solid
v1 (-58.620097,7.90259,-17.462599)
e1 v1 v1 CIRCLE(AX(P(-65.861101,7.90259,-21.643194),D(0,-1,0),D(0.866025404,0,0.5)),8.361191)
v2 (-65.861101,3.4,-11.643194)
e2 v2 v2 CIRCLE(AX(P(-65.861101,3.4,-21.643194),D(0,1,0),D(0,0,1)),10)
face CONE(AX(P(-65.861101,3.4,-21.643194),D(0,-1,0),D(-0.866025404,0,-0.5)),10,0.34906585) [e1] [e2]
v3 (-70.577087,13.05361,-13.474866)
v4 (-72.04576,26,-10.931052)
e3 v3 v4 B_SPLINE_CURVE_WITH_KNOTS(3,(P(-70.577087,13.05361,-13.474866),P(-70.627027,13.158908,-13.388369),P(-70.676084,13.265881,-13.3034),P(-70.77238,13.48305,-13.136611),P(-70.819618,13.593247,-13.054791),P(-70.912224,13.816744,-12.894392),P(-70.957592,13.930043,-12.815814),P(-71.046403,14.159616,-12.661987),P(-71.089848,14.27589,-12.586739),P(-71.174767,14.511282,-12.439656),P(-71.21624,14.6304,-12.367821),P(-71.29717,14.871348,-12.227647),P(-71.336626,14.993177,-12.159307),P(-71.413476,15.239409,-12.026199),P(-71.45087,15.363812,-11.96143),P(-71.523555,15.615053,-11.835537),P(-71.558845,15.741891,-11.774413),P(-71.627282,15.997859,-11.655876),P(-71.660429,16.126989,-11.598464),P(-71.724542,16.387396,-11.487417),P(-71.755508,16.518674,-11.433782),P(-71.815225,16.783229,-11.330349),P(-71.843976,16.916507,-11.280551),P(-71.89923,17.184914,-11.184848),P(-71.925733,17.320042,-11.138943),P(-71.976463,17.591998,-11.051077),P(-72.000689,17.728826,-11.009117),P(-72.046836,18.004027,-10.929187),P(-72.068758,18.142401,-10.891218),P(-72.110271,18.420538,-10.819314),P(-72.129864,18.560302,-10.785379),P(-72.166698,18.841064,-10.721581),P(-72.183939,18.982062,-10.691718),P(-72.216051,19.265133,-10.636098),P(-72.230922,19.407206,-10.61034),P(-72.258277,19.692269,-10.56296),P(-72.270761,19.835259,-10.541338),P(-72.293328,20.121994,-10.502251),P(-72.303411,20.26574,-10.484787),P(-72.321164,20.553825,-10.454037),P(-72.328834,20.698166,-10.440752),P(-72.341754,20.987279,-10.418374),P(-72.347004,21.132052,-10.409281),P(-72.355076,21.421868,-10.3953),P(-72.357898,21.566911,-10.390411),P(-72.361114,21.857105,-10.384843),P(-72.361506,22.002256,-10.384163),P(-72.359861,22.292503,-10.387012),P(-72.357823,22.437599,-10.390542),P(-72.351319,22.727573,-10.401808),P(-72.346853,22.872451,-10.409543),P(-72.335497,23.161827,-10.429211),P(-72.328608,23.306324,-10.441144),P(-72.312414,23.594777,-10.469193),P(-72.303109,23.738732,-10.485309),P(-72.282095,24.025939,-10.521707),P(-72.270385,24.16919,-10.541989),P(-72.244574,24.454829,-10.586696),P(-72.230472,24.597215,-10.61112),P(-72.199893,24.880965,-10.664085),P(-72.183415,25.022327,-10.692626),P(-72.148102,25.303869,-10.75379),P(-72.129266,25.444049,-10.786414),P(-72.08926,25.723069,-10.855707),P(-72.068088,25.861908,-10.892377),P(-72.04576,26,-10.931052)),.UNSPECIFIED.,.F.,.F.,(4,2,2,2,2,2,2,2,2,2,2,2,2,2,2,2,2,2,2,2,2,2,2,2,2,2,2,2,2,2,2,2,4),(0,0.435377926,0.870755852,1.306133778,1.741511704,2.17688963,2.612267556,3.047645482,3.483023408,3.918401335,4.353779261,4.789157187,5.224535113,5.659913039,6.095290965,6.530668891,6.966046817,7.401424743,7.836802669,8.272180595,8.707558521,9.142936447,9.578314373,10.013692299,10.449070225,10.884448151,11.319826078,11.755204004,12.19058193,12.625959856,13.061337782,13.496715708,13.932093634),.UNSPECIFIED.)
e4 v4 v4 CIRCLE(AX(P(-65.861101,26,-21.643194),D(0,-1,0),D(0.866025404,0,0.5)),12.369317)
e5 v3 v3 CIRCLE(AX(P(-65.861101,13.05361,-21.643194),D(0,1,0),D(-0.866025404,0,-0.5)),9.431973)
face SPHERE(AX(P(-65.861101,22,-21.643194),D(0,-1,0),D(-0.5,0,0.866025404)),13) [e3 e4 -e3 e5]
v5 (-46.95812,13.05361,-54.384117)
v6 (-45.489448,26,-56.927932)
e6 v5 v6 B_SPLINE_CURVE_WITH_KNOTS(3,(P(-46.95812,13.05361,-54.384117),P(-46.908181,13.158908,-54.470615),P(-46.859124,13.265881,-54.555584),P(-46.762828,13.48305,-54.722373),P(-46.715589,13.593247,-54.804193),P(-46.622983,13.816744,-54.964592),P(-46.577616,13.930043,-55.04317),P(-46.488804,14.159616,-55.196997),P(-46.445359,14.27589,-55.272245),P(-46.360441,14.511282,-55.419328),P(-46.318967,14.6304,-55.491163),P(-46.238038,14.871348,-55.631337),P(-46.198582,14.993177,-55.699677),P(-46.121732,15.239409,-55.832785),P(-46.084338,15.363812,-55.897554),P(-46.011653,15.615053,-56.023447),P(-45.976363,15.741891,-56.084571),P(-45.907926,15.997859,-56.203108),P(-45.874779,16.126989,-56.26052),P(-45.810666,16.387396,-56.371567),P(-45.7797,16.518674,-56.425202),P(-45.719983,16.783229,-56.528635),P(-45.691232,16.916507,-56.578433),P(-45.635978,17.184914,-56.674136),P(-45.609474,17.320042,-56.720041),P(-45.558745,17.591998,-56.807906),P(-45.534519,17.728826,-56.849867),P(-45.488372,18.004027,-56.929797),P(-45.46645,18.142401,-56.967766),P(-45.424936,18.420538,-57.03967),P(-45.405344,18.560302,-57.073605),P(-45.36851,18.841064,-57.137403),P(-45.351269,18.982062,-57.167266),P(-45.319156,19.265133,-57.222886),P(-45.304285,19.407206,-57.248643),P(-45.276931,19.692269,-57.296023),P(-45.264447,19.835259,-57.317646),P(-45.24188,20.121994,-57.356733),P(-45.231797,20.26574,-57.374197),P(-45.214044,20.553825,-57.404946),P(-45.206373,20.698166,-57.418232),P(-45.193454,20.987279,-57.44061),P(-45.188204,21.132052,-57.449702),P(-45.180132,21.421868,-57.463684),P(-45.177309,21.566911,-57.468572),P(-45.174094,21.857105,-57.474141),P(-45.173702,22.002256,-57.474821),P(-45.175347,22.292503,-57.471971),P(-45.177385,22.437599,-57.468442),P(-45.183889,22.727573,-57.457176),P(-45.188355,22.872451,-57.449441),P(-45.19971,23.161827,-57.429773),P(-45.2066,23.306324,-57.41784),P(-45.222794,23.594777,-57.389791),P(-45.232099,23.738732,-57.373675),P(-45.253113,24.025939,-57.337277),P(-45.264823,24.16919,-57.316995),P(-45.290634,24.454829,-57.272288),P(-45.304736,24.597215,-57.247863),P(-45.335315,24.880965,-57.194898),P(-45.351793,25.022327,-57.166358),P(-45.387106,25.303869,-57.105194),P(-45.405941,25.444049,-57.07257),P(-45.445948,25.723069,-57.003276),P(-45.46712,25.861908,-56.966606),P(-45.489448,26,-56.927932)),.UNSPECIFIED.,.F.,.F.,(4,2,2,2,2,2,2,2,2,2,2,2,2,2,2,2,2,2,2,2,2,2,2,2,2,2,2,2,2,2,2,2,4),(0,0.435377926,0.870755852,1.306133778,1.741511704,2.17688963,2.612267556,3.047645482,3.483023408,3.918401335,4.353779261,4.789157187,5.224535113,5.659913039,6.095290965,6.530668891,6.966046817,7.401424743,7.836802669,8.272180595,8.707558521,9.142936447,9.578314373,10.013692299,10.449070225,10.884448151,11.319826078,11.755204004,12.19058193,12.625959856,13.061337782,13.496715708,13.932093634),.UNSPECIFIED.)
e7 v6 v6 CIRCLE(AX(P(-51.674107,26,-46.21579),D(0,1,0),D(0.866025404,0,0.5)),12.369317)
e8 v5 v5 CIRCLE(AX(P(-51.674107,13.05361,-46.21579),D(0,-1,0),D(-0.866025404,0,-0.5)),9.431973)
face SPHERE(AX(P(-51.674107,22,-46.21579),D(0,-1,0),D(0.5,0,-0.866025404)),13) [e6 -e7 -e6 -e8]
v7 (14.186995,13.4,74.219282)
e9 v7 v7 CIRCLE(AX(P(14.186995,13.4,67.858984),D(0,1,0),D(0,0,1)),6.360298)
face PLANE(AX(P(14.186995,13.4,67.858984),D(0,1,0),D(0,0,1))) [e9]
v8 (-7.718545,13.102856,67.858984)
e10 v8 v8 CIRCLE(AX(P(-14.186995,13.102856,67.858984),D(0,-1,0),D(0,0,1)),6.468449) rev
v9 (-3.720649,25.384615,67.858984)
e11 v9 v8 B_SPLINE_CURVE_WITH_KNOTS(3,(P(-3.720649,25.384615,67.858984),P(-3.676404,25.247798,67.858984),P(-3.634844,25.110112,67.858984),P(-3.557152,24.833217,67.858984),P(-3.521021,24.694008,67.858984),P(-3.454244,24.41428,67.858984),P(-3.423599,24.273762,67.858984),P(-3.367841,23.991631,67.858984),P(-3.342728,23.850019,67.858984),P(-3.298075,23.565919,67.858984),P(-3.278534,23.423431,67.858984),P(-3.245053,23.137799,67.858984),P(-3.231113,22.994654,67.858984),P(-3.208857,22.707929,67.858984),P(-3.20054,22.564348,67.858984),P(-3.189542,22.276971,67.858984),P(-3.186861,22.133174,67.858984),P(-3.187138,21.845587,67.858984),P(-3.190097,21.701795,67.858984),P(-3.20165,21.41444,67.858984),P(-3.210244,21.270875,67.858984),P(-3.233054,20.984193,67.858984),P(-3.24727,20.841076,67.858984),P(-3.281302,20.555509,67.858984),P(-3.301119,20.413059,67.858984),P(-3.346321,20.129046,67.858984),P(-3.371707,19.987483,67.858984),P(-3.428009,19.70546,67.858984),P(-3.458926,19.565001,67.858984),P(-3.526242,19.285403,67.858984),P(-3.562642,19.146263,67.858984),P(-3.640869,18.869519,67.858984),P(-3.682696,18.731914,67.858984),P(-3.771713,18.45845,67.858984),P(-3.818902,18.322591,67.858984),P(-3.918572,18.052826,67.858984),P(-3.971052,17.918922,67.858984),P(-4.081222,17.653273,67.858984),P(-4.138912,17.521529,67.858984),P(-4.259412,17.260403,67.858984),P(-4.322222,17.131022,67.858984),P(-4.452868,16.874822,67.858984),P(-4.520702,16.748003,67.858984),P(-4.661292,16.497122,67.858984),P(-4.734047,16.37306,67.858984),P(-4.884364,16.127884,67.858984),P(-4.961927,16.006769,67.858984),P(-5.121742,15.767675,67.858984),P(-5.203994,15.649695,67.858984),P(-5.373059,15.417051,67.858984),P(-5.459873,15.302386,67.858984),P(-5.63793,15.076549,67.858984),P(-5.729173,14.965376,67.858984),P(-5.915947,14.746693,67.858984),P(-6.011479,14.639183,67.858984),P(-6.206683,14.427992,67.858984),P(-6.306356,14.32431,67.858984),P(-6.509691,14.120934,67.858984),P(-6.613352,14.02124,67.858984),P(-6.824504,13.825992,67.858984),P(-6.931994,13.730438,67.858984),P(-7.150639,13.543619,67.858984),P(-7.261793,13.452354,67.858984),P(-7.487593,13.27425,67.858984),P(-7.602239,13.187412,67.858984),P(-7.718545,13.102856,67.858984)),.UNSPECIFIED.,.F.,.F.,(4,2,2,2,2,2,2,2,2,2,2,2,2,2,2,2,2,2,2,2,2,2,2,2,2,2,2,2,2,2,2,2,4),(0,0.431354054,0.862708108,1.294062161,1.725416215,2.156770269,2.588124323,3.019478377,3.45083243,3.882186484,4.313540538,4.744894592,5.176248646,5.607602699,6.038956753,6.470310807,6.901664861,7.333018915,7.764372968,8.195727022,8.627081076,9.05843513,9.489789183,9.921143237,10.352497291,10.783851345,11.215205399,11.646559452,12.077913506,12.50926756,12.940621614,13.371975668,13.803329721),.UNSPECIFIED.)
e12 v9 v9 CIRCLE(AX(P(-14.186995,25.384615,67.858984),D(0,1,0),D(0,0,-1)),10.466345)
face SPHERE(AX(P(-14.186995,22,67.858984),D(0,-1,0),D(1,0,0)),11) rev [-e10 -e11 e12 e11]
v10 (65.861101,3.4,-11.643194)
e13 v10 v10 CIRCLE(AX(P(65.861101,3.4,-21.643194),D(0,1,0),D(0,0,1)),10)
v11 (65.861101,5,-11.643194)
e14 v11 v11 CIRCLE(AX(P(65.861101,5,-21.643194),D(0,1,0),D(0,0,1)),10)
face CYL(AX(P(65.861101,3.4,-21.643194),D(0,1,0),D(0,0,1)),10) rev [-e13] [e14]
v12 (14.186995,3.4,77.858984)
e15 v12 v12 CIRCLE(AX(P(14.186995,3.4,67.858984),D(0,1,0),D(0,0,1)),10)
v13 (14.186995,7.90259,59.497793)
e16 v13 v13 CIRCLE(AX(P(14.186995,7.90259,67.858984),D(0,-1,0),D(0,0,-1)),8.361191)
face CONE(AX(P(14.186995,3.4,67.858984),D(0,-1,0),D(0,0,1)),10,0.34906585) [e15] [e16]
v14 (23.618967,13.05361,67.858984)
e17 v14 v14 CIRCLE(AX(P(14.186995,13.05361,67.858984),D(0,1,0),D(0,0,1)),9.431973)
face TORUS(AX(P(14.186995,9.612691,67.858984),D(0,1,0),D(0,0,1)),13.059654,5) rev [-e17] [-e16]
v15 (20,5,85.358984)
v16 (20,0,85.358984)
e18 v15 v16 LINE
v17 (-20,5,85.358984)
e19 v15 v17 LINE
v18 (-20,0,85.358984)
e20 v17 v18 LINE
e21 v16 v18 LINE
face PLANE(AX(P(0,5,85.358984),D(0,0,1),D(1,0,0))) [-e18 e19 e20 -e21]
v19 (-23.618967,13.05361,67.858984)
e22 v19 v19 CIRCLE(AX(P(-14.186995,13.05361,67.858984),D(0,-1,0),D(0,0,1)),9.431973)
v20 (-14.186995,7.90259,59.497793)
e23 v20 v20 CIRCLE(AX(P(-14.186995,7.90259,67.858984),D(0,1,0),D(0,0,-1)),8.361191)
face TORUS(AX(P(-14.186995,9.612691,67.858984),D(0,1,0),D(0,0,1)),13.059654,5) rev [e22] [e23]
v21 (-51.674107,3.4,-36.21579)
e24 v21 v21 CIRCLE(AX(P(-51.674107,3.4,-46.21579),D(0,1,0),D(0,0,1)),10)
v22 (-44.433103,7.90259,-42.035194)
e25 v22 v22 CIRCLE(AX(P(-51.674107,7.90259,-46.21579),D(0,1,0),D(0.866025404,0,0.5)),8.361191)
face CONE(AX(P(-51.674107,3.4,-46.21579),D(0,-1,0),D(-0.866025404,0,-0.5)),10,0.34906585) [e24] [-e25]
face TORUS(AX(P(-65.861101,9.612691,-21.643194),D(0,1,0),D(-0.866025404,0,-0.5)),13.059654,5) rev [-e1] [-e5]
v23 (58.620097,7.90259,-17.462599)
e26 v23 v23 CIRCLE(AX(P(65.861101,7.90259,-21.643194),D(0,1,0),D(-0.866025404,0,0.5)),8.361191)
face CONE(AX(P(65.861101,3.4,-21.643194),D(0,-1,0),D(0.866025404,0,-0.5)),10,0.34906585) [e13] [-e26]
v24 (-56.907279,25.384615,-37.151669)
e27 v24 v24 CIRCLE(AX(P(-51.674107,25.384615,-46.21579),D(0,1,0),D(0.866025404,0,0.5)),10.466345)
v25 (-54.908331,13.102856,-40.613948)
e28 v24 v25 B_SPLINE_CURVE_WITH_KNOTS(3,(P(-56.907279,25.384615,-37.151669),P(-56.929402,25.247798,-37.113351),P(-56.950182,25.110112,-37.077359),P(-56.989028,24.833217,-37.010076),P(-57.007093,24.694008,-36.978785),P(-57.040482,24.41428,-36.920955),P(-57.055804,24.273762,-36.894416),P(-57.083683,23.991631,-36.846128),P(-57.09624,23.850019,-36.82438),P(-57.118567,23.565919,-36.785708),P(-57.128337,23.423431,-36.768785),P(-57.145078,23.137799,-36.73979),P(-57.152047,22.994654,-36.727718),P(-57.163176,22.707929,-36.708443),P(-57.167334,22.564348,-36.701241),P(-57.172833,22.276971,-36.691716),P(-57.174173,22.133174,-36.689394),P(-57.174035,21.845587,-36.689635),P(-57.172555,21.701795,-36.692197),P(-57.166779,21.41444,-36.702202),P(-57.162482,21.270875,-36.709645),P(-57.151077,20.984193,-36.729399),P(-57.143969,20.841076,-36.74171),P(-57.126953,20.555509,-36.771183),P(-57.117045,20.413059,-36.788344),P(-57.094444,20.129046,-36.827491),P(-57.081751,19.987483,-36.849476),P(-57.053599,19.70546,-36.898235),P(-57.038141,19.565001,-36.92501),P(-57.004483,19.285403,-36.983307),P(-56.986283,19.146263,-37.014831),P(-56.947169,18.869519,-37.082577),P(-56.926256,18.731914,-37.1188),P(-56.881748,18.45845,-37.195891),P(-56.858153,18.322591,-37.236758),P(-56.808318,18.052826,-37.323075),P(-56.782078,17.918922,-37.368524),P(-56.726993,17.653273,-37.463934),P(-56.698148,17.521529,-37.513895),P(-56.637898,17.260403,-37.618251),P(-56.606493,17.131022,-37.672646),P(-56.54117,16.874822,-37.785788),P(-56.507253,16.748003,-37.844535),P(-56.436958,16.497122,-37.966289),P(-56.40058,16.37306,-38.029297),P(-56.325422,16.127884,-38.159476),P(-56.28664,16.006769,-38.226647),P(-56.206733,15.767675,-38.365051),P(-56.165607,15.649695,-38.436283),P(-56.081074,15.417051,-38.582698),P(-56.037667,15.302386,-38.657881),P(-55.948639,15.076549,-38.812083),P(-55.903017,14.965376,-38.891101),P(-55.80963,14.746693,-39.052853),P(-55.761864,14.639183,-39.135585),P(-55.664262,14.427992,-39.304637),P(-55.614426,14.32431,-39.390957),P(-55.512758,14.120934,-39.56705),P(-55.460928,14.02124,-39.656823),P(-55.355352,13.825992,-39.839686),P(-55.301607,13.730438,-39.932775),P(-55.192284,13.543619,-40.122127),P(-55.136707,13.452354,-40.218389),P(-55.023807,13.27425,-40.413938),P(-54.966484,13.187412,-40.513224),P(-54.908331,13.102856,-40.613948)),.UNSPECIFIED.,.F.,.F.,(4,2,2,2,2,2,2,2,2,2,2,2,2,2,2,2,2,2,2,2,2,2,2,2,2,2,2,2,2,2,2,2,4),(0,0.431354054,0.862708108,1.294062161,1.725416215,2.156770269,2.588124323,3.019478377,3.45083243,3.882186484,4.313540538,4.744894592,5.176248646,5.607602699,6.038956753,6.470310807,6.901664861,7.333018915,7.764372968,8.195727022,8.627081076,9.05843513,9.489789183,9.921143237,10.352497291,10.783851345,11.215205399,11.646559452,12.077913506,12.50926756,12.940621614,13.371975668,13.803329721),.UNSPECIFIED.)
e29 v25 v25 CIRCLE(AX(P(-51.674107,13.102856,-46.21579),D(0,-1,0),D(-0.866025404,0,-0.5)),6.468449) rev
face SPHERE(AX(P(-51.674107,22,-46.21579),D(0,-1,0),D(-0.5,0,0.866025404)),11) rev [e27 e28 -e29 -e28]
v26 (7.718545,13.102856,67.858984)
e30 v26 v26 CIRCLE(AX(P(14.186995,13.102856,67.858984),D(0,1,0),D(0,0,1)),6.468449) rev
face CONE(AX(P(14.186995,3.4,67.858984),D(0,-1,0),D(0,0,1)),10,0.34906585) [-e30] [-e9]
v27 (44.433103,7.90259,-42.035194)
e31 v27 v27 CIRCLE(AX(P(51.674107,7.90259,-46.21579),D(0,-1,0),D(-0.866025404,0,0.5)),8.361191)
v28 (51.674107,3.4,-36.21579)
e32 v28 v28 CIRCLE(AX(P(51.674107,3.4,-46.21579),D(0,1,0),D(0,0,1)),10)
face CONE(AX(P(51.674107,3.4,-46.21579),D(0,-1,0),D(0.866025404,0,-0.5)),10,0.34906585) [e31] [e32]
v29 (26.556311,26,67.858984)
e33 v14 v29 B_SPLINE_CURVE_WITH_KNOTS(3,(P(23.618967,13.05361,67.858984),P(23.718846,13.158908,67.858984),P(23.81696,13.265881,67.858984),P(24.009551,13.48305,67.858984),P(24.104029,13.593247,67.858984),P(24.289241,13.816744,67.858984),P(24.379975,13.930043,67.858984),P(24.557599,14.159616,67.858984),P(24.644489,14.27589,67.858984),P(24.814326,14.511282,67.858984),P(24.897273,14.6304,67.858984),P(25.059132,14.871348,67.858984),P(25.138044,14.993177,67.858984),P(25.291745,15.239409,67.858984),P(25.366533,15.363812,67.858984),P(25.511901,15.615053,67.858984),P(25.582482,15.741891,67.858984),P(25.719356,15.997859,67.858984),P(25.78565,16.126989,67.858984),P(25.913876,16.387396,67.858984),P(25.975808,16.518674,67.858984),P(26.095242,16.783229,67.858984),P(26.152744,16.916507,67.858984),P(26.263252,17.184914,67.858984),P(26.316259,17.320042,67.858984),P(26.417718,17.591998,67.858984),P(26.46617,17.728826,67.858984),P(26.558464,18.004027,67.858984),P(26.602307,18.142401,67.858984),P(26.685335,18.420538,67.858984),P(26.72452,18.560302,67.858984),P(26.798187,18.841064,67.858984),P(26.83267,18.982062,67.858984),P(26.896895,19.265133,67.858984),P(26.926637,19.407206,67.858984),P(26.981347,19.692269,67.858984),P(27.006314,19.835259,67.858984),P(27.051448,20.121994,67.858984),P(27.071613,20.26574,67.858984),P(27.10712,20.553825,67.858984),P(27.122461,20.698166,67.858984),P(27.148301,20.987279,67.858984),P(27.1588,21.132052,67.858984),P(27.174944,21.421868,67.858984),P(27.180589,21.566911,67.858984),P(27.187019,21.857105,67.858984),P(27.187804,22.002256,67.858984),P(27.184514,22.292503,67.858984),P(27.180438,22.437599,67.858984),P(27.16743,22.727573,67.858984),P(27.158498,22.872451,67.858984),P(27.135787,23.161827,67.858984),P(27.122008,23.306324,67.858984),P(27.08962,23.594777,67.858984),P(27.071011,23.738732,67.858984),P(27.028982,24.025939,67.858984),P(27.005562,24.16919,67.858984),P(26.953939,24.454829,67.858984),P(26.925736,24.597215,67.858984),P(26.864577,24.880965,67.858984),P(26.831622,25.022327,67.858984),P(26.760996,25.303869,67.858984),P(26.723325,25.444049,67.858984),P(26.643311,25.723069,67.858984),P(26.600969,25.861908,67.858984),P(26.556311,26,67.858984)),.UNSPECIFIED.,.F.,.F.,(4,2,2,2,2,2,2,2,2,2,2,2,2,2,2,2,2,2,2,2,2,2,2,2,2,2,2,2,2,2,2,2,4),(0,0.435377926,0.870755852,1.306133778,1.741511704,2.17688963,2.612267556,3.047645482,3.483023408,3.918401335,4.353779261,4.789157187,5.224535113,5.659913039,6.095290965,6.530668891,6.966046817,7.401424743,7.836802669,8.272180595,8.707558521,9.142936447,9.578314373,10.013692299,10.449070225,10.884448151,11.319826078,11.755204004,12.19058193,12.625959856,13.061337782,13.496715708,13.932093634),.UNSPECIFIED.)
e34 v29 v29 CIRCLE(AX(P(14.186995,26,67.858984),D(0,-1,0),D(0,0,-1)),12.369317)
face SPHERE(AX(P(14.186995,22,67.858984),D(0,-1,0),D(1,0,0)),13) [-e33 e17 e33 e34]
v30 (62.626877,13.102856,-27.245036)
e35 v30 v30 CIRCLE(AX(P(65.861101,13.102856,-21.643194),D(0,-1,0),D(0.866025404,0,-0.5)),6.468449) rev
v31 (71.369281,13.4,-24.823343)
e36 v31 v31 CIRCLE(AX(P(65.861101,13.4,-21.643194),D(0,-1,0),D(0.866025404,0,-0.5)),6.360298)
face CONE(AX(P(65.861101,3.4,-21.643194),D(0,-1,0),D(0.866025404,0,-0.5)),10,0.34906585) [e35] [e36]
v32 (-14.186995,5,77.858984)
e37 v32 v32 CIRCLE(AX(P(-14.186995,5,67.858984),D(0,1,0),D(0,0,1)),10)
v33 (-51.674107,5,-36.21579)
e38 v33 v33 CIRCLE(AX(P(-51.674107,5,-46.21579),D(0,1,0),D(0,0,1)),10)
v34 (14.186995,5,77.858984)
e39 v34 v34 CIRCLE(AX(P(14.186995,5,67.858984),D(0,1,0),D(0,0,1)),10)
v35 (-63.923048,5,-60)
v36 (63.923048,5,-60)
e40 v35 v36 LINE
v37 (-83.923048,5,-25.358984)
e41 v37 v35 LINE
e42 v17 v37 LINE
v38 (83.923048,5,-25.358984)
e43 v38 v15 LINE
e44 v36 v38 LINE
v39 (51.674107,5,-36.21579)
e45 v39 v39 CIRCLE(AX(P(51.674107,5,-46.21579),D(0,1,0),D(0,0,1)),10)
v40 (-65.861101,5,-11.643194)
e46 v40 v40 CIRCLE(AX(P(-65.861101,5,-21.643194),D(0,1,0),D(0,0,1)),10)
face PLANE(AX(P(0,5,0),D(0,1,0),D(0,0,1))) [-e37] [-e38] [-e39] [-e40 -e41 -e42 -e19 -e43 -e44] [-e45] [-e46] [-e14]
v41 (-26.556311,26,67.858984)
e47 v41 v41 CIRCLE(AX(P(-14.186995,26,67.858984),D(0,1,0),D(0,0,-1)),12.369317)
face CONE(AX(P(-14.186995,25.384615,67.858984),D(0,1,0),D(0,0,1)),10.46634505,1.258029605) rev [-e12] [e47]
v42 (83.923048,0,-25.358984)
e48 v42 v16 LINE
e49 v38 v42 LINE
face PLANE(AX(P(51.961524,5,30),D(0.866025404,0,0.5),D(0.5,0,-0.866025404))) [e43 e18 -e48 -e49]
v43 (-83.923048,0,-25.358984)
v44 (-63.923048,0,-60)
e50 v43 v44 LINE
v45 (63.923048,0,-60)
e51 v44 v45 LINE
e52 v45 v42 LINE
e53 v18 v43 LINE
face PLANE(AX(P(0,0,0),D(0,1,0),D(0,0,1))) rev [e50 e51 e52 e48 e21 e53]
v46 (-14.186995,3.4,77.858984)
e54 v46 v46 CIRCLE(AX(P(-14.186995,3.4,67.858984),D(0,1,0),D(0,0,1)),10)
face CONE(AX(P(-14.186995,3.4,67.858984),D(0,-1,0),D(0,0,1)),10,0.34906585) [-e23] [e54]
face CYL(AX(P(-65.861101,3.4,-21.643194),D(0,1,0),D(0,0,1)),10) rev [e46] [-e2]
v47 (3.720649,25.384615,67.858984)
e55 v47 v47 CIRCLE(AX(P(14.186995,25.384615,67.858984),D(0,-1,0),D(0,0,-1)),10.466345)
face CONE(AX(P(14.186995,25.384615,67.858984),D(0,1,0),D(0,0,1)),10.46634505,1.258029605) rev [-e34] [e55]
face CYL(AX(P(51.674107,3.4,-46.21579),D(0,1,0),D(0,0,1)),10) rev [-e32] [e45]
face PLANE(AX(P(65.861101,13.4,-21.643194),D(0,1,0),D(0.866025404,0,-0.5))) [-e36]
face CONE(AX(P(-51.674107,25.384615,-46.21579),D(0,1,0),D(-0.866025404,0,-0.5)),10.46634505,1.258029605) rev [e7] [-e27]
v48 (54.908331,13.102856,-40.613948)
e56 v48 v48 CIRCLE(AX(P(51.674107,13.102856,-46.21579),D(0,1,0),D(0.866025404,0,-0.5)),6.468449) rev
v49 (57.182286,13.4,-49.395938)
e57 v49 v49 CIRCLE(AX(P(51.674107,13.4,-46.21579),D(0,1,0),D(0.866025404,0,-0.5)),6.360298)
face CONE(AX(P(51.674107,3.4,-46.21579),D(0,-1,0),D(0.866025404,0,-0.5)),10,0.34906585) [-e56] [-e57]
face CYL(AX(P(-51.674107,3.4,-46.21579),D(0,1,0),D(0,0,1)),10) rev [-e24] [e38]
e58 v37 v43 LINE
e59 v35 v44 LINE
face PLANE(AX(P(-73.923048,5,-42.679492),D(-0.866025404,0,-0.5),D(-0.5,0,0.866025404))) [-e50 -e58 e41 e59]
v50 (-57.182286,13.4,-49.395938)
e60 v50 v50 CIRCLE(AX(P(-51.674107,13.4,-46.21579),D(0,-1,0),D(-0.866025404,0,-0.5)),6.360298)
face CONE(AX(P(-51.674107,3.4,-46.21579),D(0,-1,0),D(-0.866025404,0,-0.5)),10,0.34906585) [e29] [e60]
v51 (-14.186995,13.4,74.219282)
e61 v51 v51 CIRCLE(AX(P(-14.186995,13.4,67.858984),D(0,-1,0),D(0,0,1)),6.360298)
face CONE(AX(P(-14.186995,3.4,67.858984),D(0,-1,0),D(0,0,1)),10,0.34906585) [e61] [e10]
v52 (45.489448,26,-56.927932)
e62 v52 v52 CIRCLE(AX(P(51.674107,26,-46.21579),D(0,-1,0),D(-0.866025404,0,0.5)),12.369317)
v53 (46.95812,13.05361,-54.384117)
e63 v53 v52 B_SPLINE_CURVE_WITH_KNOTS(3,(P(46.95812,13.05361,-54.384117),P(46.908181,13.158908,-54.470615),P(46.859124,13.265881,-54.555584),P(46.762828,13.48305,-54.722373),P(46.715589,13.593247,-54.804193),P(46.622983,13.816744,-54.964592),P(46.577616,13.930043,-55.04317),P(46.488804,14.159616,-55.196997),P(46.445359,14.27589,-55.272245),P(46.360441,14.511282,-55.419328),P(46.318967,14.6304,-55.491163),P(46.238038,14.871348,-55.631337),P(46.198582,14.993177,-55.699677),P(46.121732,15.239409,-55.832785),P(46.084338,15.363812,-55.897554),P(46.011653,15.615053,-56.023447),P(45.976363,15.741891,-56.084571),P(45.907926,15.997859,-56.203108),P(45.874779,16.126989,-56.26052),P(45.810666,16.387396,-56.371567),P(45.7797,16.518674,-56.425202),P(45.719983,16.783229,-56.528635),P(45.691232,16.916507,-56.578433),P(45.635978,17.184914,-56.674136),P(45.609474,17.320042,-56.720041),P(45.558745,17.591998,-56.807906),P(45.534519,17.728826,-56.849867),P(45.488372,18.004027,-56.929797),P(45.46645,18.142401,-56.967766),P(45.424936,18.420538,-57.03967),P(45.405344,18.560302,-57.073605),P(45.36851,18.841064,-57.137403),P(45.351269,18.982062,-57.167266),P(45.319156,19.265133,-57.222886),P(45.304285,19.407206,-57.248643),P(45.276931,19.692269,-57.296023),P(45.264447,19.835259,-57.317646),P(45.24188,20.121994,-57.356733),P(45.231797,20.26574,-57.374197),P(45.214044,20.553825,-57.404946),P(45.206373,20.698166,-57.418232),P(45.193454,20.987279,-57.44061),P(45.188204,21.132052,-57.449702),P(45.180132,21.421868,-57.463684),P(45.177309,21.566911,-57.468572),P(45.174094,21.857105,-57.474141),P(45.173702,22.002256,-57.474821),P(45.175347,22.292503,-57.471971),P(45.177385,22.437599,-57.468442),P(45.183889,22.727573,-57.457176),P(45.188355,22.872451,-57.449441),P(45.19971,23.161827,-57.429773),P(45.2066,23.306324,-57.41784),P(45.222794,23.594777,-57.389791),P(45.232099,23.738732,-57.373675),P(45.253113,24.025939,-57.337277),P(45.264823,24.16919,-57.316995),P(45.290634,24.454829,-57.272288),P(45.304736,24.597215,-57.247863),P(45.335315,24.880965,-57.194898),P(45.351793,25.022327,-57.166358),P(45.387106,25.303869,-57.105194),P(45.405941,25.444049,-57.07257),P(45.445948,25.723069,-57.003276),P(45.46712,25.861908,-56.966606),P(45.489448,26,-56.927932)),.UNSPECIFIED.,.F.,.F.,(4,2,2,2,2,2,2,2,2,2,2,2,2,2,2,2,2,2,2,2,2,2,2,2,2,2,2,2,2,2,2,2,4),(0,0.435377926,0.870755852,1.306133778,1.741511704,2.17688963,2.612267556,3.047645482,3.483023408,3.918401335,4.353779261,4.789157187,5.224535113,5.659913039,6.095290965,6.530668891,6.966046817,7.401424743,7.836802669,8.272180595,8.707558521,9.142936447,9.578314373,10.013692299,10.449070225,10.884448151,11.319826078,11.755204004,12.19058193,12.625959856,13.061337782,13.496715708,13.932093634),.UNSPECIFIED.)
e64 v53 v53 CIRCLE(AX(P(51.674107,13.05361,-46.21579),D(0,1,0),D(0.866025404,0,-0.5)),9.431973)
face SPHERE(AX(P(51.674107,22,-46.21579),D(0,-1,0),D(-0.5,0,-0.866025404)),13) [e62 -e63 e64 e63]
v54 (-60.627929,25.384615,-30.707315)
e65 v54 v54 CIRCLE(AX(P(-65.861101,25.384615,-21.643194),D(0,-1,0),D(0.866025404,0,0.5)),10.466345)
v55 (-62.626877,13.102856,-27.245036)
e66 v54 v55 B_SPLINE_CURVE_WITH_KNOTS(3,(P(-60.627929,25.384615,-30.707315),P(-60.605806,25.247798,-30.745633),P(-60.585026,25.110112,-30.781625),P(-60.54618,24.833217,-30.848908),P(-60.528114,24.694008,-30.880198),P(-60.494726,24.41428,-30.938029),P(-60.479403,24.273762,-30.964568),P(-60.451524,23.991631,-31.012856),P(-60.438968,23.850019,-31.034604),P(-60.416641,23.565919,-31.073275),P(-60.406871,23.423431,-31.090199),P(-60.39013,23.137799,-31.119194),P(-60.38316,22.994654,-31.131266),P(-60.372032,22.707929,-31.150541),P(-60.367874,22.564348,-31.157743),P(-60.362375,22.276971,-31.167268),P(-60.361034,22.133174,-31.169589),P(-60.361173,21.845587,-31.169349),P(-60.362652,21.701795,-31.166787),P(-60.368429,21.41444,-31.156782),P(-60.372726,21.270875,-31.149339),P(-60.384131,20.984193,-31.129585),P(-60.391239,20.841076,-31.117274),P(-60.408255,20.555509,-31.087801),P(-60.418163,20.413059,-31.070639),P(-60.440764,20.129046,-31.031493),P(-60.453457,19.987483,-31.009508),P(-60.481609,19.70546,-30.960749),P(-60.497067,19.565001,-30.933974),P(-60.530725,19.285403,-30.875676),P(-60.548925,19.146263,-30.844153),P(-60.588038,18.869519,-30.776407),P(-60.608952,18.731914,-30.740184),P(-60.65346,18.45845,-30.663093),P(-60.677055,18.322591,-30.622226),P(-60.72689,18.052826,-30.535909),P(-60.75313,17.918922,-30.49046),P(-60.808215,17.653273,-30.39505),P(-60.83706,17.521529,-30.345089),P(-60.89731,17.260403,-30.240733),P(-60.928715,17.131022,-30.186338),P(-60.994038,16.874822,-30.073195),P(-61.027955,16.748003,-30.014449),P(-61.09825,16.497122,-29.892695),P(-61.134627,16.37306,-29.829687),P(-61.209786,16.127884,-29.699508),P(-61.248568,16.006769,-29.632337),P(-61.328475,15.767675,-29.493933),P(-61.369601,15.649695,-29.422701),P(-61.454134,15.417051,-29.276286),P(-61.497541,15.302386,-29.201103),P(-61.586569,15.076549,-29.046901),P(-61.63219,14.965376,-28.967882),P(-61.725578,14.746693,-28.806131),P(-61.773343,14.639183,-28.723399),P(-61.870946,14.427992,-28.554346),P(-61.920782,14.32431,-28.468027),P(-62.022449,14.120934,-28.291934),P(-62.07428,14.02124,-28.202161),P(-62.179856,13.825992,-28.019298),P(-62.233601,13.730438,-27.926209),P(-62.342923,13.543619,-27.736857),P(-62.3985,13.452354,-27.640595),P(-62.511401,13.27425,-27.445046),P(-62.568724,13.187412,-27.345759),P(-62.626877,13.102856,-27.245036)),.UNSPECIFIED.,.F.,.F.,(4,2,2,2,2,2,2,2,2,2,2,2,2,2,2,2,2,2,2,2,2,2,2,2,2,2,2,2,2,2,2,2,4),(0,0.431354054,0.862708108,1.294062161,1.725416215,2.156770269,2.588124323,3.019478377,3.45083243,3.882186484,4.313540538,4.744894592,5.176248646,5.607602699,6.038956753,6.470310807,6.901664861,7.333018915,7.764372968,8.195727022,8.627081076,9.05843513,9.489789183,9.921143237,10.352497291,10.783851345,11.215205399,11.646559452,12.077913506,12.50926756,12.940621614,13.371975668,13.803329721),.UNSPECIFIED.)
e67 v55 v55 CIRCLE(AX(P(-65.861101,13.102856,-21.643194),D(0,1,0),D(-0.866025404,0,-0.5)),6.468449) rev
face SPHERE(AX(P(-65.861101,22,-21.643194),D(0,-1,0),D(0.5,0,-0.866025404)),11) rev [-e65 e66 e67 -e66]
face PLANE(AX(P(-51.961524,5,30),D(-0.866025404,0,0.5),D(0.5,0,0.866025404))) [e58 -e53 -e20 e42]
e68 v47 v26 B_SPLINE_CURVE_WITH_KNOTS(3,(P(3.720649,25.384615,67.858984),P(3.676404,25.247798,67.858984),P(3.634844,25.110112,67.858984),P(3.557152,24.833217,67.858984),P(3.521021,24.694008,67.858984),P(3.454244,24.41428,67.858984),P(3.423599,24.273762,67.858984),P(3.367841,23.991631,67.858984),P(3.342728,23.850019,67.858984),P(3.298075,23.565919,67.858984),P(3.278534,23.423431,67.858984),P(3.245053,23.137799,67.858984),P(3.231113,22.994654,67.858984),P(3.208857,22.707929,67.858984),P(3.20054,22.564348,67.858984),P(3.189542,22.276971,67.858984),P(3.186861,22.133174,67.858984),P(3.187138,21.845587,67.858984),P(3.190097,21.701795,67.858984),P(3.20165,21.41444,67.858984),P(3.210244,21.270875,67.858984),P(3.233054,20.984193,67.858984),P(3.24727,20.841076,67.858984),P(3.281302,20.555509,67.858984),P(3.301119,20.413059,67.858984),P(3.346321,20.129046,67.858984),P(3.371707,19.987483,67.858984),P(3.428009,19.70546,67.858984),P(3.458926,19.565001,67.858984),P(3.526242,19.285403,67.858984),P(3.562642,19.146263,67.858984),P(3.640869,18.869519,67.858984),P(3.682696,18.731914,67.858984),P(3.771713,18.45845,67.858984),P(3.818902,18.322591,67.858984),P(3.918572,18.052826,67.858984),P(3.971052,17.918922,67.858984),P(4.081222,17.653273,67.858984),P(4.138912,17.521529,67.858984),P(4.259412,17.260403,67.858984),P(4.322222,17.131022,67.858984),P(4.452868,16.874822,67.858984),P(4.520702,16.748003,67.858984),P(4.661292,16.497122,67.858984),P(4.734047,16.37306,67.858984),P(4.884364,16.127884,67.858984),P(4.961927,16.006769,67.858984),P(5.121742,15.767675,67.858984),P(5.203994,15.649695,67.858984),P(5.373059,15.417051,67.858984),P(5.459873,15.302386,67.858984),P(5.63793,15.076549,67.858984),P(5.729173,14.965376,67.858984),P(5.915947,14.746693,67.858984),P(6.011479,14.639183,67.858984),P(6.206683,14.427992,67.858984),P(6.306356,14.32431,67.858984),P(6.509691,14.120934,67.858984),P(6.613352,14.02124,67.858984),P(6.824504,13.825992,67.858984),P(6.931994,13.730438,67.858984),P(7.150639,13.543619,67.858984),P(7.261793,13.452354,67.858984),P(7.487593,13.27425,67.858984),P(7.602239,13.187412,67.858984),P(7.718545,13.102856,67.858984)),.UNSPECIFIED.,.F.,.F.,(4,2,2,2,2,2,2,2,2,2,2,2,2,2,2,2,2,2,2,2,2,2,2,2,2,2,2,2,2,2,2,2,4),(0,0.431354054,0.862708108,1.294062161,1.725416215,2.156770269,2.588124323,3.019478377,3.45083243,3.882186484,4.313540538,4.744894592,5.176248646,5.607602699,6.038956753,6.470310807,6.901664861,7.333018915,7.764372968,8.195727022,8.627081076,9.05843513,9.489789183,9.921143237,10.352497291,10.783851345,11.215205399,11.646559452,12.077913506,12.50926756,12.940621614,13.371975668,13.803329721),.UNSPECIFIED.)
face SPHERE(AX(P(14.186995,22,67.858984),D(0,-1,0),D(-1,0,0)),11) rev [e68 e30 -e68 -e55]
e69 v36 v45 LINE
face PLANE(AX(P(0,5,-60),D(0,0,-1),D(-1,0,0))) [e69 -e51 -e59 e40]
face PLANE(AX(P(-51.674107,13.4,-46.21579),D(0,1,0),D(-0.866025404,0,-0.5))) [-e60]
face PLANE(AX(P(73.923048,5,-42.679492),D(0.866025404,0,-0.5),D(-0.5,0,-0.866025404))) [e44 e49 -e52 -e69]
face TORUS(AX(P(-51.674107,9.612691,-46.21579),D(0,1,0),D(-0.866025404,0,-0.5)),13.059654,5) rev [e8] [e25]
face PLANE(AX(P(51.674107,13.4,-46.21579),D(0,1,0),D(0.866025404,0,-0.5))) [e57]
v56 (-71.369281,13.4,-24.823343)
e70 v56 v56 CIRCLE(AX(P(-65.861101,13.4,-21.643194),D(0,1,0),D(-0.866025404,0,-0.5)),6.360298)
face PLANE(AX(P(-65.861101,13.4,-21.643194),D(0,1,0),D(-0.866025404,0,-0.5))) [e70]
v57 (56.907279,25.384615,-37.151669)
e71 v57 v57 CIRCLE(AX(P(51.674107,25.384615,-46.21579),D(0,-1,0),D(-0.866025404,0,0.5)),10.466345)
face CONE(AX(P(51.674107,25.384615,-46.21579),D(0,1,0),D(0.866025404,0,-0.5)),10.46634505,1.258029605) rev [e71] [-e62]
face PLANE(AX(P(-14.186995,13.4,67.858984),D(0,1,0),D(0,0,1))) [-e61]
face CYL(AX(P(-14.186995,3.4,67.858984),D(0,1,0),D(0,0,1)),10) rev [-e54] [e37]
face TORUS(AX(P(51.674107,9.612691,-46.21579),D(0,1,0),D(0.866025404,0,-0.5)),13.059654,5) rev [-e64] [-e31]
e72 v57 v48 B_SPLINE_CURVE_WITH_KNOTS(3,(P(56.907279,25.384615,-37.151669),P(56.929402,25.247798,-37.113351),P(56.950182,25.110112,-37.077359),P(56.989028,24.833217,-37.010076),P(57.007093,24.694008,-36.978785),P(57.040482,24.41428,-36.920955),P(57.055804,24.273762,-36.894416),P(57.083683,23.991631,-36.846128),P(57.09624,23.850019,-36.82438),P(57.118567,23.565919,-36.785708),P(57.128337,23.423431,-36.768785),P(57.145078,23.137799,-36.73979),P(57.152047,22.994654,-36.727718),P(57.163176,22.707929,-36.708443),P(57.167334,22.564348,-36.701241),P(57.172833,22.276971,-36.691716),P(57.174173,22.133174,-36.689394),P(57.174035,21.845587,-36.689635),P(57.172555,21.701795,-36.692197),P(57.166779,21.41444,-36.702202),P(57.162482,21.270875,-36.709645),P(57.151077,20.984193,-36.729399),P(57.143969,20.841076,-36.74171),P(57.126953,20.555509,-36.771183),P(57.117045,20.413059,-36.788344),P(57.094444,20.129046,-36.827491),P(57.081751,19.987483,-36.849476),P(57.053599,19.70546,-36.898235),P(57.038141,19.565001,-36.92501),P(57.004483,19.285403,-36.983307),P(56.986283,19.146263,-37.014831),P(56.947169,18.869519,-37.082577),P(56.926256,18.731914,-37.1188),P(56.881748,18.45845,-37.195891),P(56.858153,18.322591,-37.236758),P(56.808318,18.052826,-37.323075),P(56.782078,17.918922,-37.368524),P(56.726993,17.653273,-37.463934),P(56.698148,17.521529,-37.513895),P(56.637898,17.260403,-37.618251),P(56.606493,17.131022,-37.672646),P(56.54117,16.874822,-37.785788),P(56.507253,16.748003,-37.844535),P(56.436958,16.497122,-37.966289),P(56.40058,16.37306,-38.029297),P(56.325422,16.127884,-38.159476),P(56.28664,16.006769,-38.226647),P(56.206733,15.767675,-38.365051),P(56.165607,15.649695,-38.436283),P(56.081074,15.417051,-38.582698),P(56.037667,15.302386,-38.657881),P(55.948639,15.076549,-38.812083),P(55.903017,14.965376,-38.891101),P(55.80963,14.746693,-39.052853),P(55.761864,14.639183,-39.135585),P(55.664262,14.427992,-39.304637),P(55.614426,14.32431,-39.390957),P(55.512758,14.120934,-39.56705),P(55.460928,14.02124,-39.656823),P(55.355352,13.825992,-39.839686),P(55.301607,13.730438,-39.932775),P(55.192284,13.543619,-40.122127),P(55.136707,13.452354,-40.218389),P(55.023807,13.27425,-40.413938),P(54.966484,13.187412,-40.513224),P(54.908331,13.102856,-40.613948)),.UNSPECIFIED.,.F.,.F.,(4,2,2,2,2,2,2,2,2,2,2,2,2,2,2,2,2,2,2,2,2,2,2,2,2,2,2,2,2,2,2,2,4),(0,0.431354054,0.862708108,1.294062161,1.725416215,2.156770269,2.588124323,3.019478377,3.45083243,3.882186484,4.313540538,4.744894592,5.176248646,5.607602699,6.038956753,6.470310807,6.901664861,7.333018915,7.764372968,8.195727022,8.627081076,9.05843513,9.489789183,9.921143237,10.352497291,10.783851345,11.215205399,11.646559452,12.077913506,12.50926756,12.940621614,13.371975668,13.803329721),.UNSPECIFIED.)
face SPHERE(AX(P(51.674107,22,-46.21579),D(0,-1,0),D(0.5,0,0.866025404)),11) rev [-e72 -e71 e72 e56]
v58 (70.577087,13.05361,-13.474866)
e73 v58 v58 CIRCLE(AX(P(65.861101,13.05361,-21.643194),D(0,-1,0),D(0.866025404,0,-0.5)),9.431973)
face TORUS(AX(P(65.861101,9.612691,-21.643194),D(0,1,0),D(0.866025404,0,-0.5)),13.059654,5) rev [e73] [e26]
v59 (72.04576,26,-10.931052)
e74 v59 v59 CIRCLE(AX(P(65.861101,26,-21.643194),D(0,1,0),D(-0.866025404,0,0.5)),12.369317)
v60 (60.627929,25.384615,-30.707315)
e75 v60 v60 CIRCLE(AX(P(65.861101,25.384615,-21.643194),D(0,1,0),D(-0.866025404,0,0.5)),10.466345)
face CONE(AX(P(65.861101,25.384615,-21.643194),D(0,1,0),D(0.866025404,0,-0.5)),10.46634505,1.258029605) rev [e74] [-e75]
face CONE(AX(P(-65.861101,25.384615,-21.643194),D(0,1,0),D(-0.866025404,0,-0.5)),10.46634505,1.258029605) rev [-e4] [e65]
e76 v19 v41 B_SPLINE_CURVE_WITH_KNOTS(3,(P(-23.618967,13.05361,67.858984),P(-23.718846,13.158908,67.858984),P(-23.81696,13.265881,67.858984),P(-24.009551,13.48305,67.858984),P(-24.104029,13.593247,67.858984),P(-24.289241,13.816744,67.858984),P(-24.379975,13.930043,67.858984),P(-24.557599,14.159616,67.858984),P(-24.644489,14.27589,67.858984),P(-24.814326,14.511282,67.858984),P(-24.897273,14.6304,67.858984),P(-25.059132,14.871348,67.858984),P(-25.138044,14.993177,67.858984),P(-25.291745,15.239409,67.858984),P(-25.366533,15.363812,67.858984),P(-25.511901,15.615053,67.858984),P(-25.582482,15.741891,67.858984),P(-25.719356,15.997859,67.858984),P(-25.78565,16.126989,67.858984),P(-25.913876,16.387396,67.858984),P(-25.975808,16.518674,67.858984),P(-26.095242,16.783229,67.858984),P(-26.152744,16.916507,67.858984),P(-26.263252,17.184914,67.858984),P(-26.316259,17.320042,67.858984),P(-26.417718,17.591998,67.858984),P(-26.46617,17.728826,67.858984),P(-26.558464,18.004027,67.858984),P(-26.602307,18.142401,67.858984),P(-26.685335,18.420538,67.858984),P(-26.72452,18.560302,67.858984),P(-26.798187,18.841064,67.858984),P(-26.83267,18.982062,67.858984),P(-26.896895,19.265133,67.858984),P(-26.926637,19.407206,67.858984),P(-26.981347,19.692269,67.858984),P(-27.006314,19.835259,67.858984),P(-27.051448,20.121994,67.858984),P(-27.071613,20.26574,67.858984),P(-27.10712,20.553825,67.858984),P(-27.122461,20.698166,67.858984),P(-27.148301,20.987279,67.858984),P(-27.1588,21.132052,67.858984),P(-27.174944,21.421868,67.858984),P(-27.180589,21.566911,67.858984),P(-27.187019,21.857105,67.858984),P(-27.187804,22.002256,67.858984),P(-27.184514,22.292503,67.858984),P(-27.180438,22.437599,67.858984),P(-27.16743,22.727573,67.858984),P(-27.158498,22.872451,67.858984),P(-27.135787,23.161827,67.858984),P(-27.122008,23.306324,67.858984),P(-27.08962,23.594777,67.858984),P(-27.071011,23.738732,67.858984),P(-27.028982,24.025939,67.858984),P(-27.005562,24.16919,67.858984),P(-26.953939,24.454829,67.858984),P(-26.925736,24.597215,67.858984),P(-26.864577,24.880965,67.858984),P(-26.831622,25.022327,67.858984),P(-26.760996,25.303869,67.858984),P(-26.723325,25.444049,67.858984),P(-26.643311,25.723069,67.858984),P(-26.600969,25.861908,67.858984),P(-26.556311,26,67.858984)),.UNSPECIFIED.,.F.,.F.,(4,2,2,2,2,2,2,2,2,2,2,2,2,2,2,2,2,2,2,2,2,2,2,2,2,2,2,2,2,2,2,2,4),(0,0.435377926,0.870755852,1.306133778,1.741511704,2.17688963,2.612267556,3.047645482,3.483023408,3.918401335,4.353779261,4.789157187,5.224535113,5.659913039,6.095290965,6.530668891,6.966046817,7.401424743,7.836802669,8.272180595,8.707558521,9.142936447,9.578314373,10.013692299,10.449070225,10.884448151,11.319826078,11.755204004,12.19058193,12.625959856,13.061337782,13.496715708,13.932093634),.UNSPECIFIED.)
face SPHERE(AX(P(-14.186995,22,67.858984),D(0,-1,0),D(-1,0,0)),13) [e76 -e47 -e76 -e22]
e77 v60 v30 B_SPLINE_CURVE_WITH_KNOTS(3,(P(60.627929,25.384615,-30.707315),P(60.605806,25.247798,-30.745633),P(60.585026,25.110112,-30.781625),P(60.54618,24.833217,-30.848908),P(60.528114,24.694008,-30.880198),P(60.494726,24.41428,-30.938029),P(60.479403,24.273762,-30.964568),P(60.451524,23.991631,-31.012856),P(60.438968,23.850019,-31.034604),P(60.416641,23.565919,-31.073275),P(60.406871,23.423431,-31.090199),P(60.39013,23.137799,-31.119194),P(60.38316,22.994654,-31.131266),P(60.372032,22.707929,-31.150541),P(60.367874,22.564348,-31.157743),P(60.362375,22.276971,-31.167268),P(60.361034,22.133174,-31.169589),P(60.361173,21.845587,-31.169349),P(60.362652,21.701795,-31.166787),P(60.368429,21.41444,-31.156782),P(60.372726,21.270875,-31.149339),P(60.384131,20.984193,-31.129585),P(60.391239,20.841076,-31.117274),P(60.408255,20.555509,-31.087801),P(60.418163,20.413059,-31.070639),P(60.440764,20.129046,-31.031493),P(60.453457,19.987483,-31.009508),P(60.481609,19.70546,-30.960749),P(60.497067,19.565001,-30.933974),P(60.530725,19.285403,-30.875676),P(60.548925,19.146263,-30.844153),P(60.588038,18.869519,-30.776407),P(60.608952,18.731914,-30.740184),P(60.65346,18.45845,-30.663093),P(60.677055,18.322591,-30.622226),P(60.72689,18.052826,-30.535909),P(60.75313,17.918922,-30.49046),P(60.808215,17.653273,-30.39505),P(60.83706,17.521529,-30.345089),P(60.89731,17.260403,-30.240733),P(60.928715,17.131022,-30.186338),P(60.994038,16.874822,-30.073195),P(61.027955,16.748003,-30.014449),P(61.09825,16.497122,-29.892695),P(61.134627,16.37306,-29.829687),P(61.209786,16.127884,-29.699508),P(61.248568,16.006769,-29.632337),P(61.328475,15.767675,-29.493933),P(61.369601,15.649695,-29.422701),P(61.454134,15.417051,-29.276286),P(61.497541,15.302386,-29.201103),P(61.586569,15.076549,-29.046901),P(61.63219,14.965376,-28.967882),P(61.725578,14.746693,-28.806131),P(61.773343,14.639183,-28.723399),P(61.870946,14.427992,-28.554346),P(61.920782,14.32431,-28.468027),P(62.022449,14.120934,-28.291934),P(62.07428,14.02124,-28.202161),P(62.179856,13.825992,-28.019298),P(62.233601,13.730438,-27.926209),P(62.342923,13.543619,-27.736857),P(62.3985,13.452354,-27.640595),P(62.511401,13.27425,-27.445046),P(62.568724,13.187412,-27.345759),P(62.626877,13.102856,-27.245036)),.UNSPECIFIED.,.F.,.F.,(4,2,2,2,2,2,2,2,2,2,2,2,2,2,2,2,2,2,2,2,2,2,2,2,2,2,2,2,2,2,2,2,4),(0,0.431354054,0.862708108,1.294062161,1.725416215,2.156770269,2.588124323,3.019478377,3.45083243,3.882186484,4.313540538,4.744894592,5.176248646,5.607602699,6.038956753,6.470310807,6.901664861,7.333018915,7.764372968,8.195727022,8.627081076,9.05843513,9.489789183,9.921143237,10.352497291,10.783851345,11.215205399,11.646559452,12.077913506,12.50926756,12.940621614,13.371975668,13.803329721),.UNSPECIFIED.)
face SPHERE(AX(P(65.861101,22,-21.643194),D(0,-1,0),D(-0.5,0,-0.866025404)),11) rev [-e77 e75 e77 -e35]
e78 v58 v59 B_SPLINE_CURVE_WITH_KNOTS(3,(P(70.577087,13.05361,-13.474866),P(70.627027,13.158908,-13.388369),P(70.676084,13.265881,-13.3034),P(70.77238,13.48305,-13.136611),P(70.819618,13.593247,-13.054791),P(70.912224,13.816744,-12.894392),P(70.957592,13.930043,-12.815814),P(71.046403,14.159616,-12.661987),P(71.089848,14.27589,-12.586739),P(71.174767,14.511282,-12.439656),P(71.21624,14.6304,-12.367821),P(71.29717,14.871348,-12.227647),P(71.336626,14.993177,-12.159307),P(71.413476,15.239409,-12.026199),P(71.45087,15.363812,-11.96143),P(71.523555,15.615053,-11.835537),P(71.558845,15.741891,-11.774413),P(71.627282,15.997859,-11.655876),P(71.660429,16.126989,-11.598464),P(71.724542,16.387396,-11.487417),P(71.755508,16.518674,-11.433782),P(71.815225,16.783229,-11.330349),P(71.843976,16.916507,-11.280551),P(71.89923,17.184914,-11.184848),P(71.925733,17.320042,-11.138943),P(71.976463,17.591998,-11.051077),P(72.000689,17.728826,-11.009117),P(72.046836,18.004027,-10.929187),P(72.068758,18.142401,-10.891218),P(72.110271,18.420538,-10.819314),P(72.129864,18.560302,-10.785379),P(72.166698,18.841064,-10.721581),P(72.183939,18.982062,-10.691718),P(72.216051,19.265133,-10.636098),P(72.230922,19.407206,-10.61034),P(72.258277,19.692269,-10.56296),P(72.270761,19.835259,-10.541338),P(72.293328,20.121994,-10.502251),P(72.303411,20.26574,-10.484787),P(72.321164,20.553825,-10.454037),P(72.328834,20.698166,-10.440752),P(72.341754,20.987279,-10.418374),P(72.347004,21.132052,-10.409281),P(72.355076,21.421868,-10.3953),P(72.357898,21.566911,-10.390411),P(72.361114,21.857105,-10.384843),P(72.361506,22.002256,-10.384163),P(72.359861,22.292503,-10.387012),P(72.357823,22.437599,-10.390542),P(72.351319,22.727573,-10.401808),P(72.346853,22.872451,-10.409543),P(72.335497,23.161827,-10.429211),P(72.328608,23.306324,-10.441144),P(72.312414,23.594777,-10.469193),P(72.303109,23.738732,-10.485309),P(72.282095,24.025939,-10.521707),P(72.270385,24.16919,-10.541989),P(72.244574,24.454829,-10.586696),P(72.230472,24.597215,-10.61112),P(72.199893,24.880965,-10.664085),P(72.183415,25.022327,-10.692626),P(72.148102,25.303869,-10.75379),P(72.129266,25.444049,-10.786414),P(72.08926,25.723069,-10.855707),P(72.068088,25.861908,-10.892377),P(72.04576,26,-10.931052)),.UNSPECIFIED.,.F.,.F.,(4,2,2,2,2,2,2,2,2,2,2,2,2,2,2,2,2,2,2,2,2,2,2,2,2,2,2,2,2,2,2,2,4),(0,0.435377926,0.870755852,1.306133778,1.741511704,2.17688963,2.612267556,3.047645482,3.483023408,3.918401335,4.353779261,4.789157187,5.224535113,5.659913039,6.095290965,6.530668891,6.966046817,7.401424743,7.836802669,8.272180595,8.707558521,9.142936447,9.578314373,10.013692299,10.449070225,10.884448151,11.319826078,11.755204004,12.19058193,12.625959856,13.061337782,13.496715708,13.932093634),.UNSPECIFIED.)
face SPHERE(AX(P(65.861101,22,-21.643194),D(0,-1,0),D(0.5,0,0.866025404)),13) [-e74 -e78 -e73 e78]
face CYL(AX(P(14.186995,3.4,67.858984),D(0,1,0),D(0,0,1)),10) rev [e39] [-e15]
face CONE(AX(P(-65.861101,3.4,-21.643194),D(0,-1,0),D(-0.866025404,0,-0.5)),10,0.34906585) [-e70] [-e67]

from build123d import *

# Parameters (mm, degrees)
BOSS_EXTRUDE1_DEPTH  = 5
CUT_EXTRUDE4_START   = 5
SKETCH1_5_R          = 10
CUT_EXTRUDE4_DEPTH   = 1.6
CIRPATTERN1_COUNT    = 3
SKETCH6_R            = 10
BOSS_EXTRUDE2_DEPTH  = 10
BOSS_EXTRUDE2_TAPER  = 20
FILLET1_R            = 5
FILLET1_OF_MIRROR1_R = 5


# Read off the part's stored shape, not the designer's step: CirPattern2
with BuildPart() as part:
    # Sketch1 → Boss-Extrude1 (new body)
    with BuildSketch(Plane(origin=(0, 0, 0), x_dir=(1, 0, 0), z_dir=(0, 1, 0))):
        Polygon((20, -85.358983849), (83.923048454, 25.358983849), (63.923048454, 60), (-63.923048454, 60), (-83.923048454, 25.358983849), (-20, -85.358983849), align=None)
    extrude(amount=BOSS_EXTRUDE1_DEPTH)

    # Sketch1<5> → Cut-Extrude4 (cut)
    with BuildSketch(Plane(origin=(0, 0, 0), x_dir=(1, 0, 0), z_dir=(0, 1, 0)).offset(CUT_EXTRUDE4_START)):
        with Locations(Location((-14.186994533, -67.858983849, 0), (0, 0, 270))):
            Circle(SKETCH1_5_R)
        with Locations(Location((14.186994533, -67.858983849, 0), (0, 0, 270))):
            Circle(SKETCH1_5_R)
    cut_extrude4 = extrude(amount=-CUT_EXTRUDE4_DEPTH, mode=Mode.SUBTRACT)

    # CirPattern1: Cut-Extrude4 ×3 about axis
    cirpattern1_axis = Axis((0, 0, 0), (0, 1, 0))
    for i in range(1, CIRPATTERN1_COUNT):
        add(cut_extrude4.rotate(cirpattern1_axis, i * 360 / CIRPATTERN1_COUNT), mode=Mode.SUBTRACT)



with BuildPart() as body_2:
    # Sketch5 → Revolve1 (revolve)
    with BuildSketch(Plane.YX.offset(-67.858983849), mode=Mode.PRIVATE) as revolve1_sk:
        with BuildLine():
            Line((11, 14.186994533), (9, 14.186994533))
            ThreePointArc((9, 14.186994533), (14.35147073, 24.698892554), (26, 26.55631141))
            Line((26, 26.55631141), (25.384615385, 24.653339583))
            ThreePointArc((25.384615385, 24.653339583), (15.52816754, 23.081677474), (11, 14.186994533))
        make_face()
    revolve1 = revolve(revolve1_sk.sketch.rotate(Axis((14.186994533, 5, 67.858983849), (0, 1, 0)), 90), axis=Axis((14.186994533, 5, 67.858983849), (0, 1, 0)))


with BuildPart() as part_1:
    add(part.part)

    add(body_2.part)  # Boss-Extrude2 merges body 2
    # Sketch6 → Boss-Extrude2 (add)
    with BuildSketch(Plane(origin=(0, 3.4, 0), x_dir=(1, 0, 0), z_dir=(0, 1, 0))):
        with Locations(Location((14.186994533, -67.858983849, 0), (0, 0, 270))):
            Circle(SKETCH6_R)
    boss_extrude2 = extrude(amount=BOSS_EXTRUDE2_DEPTH, taper=BOSS_EXTRUDE2_TAPER)

    # Fillet1
    fillet1_edges = [part_1.edges().sort_by_distance(p)[0] for p in [
        (21.362657137, 11.159803221, 67.858983849),
    ]]
    fillet(fillet1_edges, radius=FILLET1_R)

    # Mirror1: Revolve1, Boss-Extrude2 across plane
    add(revolve1.mirror(Plane(origin=(0, 0, 0), x_dir=(0, 0, 1), z_dir=(1, 0, 0))))
    add(boss_extrude2.mirror(Plane(origin=(0, 0, 0), x_dir=(0, 0, 1), z_dir=(1, 0, 0))))

    # Fillet1 of Mirror1
    fillet1_of_mirror1_edges = [part_1.edges().sort_by_distance(p)[0] for p in [
        (-21.362657137, 11.159803221, 67.858983849),
    ]]
    fillet(fillet1_of_mirror1_edges, radius=FILLET1_OF_MIRROR1_R)

    # CirPattern2 outline → CirPattern2 (revolve)
    with BuildSketch(Plane(origin=(51.674106621, 0, -46.215789594), x_dir=(1, 0, 0), z_dir=(0, 0, 1))):
        with BuildLine():
            Line((6.360297657, 13.4), (0, 13.4))
            Line((0, 13.4), (0, 3.4))
            Line((0, 3.4), (10, 3.4))
            Line((10, 3.4), (8.361191226, 7.902590101))
            ThreePointArc((8.361191226, 7.902590101), (8.164307186, 10.630323533), (9.431972572, 13.053610035))
            ThreePointArc((9.431972572, 13.053610035), (12.677788004, 19.123597505), (12.369316875, 26.000000006))
            Line((12.369316875, 26.000000006), (10.466345048, 25.38461539))
            ThreePointArc((10.466345048, 25.38461539), (10.459790386, 18.59518208), (6.468449114, 13.102856298))
            Line((6.468449114, 13.102856298), (6.360297657, 13.4))
        make_face()
    revolve(axis=Axis((51.674106621, 0, -46.215789594), (0, 1, 0)))

    # CirPattern2 2 outline → CirPattern2 2 (revolve)
    with BuildSketch(Plane(origin=(-65.861101155, 0, -21.643194255), x_dir=(1, 0, 0), z_dir=(0, 0, 1))):
        with BuildLine():
            Line((6.360297657, 13.4), (0, 13.4))
            Line((0, 13.4), (0, 3.4))
            Line((0, 3.4), (10, 3.4))
            Line((10, 3.4), (8.361191226, 7.902590101))
            ThreePointArc((8.361191226, 7.902590101), (8.164307186, 10.630323533), (9.431972572, 13.053610035))
            ThreePointArc((9.431972572, 13.053610035), (12.677788004, 19.123597505), (12.369316875, 26.000000006))
            Line((12.369316875, 26.000000006), (10.466345048, 25.38461539))
            ThreePointArc((10.466345048, 25.38461539), (10.459790386, 18.59518208), (6.468449114, 13.102856298))
            Line((6.468449114, 13.102856298), (6.360297657, 13.4))
        make_face()
    revolve(axis=Axis((-65.861101155, 0, -21.643194255), (0, 1, 0)))

    # CirPattern2 3 outline → CirPattern2 3 (revolve)
    with BuildSketch(Plane(origin=(65.861101155, 0, -21.643194255), x_dir=(1, 0, 0), z_dir=(0, 0, 1))):
        with BuildLine():
            Line((6.360297657, 13.4), (0, 13.4))
            Line((0, 13.4), (0, 3.4))
            Line((0, 3.4), (10, 3.4))
            Line((10, 3.4), (8.361191226, 7.902590101))
            ThreePointArc((8.361191226, 7.902590101), (8.164307186, 10.630323533), (9.431972572, 13.053610035))
            ThreePointArc((9.431972572, 13.053610035), (12.677788004, 19.123597505), (12.369316875, 26.000000006))
            Line((12.369316875, 26.000000006), (10.466345048, 25.38461539))
            ThreePointArc((10.466345048, 25.38461539), (10.459790386, 18.59518208), (6.468449114, 13.102856298))
            Line((6.468449114, 13.102856298), (6.360297657, 13.4))
        make_face()
    revolve(axis=Axis((65.861101155, 0, -21.643194255), (0, 1, 0)))

    # CirPattern2 4 outline → CirPattern2 4 (revolve)
    with BuildSketch(Plane(origin=(-51.674106621, 0, -46.215789594), x_dir=(1, 0, 0), z_dir=(0, 0, 1))):
        with BuildLine():
            Line((6.360297657, 13.4), (0, 13.4))
            Line((0, 13.4), (0, 3.4))
            Line((0, 3.4), (10, 3.4))
            Line((10, 3.4), (8.361191226, 7.902590101))
            ThreePointArc((8.361191226, 7.902590101), (8.164307186, 10.630323533), (9.431972572, 13.053610035))
            ThreePointArc((9.431972572, 13.053610035), (12.677788004, 19.123597505), (12.369316875, 26.000000006))
            Line((12.369316875, 26.000000006), (10.466345048, 25.38461539))
            ThreePointArc((10.466345048, 25.38461539), (10.459790386, 18.59518208), (6.468449114, 13.102856298))
            Line((6.468449114, 13.102856298), (6.360297657, 13.4))
        make_face()
    revolve(axis=Axis((-51.674106621, 0, -46.215789594), (0, 1, 0)))


solid = part_1.part
